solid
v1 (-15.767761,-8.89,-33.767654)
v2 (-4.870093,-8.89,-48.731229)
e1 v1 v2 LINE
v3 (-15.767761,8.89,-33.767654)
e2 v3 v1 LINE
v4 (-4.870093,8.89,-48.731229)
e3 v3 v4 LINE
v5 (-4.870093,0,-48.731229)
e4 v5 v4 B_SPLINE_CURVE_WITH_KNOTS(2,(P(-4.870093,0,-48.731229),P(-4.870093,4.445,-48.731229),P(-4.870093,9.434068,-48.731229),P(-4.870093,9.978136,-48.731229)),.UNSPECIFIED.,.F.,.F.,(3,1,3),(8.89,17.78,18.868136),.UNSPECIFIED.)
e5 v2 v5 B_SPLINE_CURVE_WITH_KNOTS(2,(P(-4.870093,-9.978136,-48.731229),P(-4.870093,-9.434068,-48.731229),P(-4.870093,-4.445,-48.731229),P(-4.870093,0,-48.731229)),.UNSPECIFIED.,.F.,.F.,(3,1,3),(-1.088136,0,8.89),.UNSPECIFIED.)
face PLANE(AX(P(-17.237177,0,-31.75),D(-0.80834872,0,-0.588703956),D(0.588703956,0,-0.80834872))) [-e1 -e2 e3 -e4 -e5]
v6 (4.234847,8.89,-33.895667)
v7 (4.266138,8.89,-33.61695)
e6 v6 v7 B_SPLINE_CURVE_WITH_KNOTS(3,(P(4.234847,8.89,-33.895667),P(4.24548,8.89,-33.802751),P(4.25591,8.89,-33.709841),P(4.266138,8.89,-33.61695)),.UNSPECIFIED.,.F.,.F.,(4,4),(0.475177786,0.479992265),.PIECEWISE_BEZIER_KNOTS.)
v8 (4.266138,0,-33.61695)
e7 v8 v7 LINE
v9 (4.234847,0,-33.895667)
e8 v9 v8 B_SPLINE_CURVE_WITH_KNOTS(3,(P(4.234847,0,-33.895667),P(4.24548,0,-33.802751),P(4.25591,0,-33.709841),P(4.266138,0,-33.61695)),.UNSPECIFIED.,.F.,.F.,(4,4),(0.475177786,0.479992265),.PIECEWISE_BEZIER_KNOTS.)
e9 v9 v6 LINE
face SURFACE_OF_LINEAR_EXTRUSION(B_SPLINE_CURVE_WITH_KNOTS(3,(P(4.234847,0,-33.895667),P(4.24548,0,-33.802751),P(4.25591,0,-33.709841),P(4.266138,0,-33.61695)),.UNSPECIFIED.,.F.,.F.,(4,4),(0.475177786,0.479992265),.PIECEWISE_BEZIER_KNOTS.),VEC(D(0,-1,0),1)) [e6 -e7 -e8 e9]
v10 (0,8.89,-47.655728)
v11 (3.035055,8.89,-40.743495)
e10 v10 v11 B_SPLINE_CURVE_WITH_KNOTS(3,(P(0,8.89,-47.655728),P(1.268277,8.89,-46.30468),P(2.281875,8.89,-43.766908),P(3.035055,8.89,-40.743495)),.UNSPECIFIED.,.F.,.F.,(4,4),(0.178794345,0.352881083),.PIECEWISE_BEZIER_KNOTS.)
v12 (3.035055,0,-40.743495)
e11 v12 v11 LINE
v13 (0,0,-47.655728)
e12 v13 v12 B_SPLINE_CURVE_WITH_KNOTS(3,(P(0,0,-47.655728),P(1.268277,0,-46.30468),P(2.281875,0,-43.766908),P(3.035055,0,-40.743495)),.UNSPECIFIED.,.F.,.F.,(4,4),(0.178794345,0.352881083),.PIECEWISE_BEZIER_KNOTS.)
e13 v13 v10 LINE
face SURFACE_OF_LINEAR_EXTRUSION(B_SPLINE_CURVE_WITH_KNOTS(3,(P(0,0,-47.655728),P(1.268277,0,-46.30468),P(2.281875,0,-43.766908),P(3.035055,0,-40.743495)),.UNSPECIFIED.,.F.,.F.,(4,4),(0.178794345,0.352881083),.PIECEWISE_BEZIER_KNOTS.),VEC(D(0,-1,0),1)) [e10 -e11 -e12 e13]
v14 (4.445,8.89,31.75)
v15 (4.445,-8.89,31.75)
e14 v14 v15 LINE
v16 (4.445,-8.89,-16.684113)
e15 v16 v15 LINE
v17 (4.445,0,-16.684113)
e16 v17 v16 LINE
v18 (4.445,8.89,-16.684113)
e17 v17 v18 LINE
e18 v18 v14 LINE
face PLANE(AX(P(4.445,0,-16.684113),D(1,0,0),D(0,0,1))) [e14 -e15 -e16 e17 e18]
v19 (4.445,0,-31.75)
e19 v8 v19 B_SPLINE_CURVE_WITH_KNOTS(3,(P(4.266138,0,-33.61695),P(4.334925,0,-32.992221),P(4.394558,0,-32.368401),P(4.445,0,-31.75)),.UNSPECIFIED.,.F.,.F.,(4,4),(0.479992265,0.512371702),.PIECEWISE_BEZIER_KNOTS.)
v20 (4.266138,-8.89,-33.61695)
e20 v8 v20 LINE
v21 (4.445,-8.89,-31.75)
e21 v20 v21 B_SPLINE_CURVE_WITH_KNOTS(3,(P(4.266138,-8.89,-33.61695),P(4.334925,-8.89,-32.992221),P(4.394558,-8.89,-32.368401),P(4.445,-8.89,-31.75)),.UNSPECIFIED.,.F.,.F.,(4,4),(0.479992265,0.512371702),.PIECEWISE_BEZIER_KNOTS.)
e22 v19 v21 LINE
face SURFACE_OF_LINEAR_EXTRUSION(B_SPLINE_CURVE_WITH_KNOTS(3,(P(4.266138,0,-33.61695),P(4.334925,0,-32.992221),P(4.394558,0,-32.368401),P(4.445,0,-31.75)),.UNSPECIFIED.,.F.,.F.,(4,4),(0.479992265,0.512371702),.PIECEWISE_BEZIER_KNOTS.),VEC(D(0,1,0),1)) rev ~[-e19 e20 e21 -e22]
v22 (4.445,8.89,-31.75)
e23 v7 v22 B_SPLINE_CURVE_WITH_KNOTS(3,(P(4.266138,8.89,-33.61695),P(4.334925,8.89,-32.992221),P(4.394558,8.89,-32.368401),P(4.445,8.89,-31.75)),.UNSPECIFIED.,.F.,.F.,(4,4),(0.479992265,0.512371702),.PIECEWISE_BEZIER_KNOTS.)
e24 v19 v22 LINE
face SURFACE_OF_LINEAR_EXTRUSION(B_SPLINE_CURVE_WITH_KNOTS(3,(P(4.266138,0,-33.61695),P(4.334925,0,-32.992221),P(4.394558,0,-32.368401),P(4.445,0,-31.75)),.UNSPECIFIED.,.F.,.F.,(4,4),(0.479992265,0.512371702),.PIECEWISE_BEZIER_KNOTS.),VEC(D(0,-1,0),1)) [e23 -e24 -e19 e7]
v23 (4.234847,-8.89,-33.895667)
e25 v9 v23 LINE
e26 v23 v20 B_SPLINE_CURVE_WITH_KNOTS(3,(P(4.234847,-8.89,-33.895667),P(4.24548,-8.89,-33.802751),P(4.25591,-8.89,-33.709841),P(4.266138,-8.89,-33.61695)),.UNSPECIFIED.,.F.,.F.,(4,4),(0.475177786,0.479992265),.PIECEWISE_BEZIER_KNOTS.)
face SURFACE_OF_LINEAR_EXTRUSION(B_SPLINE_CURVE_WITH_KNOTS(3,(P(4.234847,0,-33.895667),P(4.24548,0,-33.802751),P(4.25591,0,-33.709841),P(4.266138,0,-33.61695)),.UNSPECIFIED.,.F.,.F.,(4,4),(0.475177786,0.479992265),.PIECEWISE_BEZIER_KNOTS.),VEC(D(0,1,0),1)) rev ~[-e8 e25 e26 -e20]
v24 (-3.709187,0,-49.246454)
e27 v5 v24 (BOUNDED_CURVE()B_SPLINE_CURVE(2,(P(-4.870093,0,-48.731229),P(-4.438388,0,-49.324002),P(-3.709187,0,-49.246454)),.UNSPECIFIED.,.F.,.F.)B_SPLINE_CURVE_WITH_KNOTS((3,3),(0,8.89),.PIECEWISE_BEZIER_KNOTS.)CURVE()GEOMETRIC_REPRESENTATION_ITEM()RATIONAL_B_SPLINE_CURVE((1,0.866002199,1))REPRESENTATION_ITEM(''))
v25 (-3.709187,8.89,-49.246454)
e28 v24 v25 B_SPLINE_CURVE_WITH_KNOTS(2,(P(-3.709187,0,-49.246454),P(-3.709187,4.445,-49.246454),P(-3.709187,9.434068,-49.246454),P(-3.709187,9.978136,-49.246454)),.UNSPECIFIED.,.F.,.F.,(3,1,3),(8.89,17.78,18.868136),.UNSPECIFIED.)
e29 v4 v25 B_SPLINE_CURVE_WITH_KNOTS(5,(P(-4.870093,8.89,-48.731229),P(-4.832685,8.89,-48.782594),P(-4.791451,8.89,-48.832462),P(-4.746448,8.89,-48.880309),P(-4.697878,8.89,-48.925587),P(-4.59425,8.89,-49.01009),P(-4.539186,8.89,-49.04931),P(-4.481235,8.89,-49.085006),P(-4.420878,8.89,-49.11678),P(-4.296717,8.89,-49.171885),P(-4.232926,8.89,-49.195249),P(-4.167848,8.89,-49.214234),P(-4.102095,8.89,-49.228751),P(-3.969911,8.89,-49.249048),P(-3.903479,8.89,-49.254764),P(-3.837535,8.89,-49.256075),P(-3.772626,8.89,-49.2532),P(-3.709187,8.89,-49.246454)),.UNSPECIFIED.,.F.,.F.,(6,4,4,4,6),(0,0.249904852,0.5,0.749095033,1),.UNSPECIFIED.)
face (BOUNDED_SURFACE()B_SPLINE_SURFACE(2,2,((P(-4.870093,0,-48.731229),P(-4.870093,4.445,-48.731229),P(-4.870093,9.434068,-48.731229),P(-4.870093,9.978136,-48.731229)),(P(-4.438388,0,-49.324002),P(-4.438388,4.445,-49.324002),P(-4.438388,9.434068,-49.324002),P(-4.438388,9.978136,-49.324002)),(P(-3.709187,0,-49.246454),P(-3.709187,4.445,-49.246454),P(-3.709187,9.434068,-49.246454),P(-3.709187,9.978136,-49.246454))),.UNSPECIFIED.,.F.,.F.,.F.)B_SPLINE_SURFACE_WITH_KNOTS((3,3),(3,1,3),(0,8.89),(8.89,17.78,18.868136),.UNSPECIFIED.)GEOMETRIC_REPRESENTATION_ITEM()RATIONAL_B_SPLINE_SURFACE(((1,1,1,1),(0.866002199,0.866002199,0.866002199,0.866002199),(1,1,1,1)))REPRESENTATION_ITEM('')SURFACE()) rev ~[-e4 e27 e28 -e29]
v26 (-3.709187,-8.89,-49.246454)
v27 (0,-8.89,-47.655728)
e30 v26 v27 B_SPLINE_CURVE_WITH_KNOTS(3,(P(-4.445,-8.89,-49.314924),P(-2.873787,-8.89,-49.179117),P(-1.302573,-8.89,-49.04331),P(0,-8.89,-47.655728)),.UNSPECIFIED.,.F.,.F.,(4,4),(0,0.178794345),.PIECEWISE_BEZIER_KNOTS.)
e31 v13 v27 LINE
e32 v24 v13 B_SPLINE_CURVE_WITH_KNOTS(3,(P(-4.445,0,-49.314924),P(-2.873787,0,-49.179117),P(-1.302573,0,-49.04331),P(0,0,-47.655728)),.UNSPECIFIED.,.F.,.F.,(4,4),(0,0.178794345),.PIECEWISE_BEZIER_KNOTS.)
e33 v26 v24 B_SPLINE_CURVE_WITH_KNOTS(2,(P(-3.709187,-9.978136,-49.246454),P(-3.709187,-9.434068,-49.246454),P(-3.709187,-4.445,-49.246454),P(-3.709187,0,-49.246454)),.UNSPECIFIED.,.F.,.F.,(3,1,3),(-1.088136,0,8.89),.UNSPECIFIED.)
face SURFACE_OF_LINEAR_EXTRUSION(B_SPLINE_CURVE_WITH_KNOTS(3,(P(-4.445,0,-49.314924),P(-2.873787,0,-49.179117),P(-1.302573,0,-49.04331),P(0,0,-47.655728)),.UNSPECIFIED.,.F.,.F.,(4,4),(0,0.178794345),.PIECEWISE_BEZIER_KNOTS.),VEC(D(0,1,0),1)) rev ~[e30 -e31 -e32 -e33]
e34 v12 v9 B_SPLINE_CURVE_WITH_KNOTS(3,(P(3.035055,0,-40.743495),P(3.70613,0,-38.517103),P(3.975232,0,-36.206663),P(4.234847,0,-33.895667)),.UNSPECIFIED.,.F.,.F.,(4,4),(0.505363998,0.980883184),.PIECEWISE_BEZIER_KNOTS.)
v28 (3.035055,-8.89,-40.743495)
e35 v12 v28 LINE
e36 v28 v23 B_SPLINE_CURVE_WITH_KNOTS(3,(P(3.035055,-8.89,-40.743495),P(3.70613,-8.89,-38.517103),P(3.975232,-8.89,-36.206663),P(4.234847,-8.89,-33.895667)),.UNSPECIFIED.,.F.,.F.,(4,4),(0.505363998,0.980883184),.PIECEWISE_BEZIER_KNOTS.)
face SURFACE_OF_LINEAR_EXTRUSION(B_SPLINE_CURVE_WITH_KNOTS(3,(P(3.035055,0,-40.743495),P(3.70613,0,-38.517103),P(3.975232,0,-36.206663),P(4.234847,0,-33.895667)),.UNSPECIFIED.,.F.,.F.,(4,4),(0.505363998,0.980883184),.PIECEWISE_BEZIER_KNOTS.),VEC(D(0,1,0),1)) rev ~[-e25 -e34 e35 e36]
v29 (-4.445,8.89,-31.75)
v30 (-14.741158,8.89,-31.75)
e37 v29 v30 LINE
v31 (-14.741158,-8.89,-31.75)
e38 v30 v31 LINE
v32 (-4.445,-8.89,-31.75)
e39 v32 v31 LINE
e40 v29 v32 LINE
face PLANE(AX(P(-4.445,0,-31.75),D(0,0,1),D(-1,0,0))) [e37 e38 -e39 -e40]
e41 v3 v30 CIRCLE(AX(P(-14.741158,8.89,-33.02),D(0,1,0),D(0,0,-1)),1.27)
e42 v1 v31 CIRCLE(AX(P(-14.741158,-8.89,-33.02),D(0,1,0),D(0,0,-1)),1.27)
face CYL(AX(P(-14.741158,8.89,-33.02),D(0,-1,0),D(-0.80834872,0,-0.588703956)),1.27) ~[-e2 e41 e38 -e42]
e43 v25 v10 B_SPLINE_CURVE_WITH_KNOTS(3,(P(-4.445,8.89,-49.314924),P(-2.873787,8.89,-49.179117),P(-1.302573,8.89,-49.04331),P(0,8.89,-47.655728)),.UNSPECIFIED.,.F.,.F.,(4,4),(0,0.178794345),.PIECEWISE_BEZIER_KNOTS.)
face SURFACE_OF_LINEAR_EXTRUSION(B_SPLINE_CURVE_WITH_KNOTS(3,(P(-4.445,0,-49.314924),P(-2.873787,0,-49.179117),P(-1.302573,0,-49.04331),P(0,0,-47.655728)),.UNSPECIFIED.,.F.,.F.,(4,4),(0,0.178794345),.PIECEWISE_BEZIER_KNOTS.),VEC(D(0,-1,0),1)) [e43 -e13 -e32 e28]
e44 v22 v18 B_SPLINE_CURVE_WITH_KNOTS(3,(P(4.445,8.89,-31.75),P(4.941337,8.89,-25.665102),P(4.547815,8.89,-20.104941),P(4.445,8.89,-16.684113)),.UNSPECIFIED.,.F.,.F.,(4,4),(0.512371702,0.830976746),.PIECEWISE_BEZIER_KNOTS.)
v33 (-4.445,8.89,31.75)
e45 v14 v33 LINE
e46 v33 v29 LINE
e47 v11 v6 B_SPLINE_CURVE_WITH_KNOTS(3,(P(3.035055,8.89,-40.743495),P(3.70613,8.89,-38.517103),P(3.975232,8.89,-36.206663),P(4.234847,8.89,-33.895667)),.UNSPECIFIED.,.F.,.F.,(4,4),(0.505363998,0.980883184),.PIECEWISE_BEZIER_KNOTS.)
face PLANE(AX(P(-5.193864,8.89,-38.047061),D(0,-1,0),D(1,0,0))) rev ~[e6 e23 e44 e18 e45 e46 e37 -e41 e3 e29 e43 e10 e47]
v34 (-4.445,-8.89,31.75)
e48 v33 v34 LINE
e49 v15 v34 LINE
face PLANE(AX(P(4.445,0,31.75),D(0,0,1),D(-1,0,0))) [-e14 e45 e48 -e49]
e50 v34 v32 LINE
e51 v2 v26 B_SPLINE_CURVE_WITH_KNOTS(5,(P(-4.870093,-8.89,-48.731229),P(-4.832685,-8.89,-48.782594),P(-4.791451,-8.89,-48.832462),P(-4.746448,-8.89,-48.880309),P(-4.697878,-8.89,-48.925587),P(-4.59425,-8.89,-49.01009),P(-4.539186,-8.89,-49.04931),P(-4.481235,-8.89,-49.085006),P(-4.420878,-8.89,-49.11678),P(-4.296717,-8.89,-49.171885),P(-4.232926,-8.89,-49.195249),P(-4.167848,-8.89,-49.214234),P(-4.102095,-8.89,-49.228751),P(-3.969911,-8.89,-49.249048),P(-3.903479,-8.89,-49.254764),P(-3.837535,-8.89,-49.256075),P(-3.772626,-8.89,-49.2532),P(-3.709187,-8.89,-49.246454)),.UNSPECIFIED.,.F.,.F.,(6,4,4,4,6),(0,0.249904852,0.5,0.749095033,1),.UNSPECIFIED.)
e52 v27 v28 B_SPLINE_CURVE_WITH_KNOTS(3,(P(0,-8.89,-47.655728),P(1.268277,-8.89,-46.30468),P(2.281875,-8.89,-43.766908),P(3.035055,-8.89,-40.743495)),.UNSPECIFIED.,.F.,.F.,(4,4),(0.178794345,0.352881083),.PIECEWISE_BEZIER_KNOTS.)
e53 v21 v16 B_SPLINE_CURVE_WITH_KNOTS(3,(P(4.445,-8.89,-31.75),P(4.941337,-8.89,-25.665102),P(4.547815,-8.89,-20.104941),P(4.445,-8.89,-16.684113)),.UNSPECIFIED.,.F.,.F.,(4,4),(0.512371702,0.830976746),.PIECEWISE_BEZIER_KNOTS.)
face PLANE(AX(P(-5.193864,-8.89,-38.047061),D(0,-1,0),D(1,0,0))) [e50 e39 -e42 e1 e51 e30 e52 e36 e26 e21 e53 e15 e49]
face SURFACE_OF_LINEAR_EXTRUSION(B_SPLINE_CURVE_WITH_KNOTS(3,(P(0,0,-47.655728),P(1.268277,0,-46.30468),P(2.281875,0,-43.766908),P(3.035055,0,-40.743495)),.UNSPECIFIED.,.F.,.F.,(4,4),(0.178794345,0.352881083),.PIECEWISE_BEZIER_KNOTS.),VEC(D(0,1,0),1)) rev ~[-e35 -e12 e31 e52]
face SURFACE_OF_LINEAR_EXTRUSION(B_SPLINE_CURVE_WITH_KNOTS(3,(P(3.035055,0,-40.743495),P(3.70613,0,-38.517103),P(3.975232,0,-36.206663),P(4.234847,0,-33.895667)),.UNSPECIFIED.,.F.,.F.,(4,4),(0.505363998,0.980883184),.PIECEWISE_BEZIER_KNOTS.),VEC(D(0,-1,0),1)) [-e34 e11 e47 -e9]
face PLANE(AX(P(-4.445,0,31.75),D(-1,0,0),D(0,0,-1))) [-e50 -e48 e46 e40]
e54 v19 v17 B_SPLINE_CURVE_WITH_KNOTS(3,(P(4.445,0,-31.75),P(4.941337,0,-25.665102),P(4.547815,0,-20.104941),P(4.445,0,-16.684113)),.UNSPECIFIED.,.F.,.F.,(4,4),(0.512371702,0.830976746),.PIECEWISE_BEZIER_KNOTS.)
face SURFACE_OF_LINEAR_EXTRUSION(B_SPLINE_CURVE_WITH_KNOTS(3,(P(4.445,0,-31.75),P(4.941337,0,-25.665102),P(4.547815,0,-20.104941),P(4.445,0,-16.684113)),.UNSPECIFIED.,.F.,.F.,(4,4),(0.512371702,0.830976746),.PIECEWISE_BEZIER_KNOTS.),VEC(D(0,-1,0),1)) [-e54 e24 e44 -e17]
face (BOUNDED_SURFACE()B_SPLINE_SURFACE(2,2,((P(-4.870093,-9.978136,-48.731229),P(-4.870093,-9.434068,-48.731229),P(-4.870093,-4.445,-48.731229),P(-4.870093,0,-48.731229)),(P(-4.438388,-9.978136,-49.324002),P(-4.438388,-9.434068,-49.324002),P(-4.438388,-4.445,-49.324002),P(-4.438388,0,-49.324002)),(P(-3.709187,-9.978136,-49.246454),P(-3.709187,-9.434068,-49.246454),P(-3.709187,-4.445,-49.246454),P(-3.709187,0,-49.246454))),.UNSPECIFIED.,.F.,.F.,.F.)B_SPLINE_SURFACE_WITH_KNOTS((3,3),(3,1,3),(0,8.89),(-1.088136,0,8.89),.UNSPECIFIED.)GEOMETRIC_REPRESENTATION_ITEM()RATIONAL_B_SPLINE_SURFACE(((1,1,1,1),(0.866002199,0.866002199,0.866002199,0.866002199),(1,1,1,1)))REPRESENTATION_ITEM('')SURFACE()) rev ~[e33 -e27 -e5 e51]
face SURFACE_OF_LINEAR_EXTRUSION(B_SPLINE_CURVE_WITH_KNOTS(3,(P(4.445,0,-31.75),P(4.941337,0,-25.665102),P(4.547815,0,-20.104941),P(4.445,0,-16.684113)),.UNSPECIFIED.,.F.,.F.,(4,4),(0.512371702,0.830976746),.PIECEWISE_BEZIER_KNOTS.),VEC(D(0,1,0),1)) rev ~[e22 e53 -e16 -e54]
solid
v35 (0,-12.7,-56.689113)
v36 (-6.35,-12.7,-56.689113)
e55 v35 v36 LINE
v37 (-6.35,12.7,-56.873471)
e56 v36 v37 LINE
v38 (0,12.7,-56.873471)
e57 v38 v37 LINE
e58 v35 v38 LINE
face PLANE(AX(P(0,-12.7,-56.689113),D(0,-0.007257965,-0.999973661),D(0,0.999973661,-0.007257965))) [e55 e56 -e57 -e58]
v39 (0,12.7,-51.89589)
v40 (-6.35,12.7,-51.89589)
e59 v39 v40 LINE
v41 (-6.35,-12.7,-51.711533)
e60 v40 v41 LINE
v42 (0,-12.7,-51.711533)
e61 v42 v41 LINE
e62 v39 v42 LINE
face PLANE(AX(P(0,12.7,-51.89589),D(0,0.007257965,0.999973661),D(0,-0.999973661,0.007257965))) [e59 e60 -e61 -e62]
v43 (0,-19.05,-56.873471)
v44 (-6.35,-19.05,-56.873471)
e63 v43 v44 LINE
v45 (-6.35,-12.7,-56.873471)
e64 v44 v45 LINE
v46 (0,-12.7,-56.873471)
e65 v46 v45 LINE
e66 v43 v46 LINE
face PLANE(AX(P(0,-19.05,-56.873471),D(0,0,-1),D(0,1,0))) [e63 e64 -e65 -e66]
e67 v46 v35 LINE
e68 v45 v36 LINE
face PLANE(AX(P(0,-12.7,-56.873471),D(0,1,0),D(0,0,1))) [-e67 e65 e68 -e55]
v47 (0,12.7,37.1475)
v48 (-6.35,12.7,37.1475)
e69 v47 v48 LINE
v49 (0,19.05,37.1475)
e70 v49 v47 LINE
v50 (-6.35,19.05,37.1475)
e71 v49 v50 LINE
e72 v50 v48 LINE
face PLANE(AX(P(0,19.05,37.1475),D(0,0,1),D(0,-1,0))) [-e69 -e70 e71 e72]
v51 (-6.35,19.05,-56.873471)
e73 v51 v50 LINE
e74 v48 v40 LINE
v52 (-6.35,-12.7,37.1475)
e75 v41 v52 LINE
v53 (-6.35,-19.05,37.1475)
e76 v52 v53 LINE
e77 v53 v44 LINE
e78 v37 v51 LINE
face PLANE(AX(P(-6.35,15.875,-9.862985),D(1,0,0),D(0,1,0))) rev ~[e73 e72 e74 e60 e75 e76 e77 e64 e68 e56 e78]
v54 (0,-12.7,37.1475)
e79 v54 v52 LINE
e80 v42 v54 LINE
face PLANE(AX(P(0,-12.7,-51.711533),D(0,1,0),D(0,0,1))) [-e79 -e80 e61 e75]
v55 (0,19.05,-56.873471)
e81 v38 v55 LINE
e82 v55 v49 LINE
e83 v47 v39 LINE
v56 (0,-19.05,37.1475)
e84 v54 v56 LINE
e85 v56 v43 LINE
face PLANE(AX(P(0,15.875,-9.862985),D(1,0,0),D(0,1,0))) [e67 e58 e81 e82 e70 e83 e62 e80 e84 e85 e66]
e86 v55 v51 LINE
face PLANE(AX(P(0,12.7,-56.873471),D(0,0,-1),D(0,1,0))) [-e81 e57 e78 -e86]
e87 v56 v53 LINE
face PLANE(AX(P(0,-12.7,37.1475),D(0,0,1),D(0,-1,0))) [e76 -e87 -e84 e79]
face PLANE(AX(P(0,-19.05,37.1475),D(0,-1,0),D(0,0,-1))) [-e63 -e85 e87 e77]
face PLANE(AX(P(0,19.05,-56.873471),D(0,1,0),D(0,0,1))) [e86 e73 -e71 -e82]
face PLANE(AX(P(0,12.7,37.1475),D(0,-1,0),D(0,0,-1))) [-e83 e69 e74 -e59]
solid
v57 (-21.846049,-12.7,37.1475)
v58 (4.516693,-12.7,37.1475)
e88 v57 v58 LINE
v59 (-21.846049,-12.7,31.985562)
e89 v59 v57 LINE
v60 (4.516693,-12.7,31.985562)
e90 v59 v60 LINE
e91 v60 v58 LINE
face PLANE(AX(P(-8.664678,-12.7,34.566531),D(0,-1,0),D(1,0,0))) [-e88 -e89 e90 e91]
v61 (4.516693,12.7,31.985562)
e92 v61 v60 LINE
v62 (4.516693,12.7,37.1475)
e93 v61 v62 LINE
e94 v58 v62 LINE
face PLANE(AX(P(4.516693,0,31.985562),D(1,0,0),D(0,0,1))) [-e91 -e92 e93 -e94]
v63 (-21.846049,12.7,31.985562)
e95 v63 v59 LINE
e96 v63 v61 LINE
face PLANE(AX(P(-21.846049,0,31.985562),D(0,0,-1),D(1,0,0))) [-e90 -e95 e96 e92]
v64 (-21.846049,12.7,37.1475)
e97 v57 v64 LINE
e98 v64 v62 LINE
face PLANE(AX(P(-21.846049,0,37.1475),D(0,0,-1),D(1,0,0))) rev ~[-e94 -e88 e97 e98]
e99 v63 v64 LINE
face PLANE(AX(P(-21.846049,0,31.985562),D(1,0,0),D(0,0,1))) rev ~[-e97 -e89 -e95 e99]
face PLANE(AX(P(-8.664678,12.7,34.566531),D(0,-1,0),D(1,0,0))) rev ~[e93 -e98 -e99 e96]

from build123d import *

# Parameters (mm, degrees)
F1_DEPTH = 8.89
F2_R     = 1.27
F3_R     = 1.27
F4_W     = 26.3627418317
F4_H     = 5.1619373262
F5_DEPTH = 12.7
F7_DEPTH = 6.35


with BuildPart() as f1:
    # F0 (on Front) → F1 (new body, symmetric)
    with BuildSketch(Plane.XZ):
        with BuildLine():
            add(Edge.make_bspline(
                [(4.2661379753, -33.616950048), (4.3349248687, -32.99222106), (4.3945578489, -32.36840068), (4.445, -31.75)],
                knots=[0.4799922653, 0.4799922653, 0.4799922653, 0.4799922653, 0.5123717025, 0.5123717025, 0.5123717025, 0.5123717025], degree=3))
            Line((4.445, -31.75), (-4.445, -31.75))
            Line((-4.445, -31.75), (-17.2371771187, -31.75))
            Line((-17.2371771187, -31.75), (-4.445, -49.3149235845))
            add(Edge.make_bspline(
                [(-4.445, -49.3149235845), (-2.8737867331, -49.1791167069), (-1.3025734662, -49.0433098293), (0, -47.6557277143)],
                knots=[0, 0, 0, 0, 0.1787943452, 0.1787943452, 0.1787943452, 0.1787943452], degree=3))
            add(Edge.make_bspline(
                [(0, -47.6557277143), (1.1546532493, -45.3808190167), (2.3218615323, -43.1096212641), (3.0350551164, -40.743494961)],
                knots=[0, 0, 0, 0, 0.5053639981, 0.5053639981, 0.5053639981, 0.5053639981], degree=3))
            add(Edge.make_bspline(
                [(3.0350551164, -40.743494961), (3.5641678247, -38.6195342287), (3.9647615791, -36.2559041312), (4.2348473132, -33.8956672077)],
                knots=[0.3528810834, 0.3528810834, 0.3528810834, 0.3528810834, 0.4751777864, 0.4751777864, 0.4751777864, 0.4751777864], degree=3))
            add(Edge.make_bspline(
                [(4.2348473132, -33.8956672077), (4.2452843652, -33.8027605788), (4.2557060854, -33.7098530506), (4.2661379753, -33.616950048)],
                knots=[0.9808831842, 0.9808831842, 0.9808831842, 0.9808831842, 1, 1, 1, 1], degree=3))
        make_face()
        with BuildLine():
            Line((-4.445, -31.75), (4.445, -31.75))
            Line((4.445, -31.75), (4.445, -16.6841130704))
            add(Edge.make_bspline(
                [(4.445, -16.6841130704), (4.390455432, -14.8693285963), (4.417727716, -13.6566404294), (4.445, -12.4439522624)],
                knots=[0.830976746, 0.830976746, 0.830976746, 0.830976746, 1, 1, 1, 1], degree=3))
            Line((4.445, -12.4439522624), (4.445, 31.75))
            Line((4.445, 31.75), (-4.445, 31.75))
            Line((-4.445, 31.75), (-4.445, -31.75))
        make_face()
        with BuildLine():
            Line((4.445, -16.6841130704), (4.445, -31.75))
            add(Edge.make_bspline(
                [(4.445, -31.75), (4.9413373419, -25.665101898), (4.5478152875, -20.1049411089), (4.445, -16.6841130704)],
                knots=[0.5123717025, 0.5123717025, 0.5123717025, 0.5123717025, 0.830976746, 0.830976746, 0.830976746, 0.830976746], degree=3))
        make_face()
        with BuildLine():
            add(Edge.make_bspline(
                [(4.445, -16.6841130704), (4.390455432, -14.8693285963), (4.417727716, -13.6566404294), (4.445, -12.4439522624)],
                knots=[0.830976746, 0.830976746, 0.830976746, 0.830976746, 1, 1, 1, 1], degree=3))
            Line((4.445, -16.6841130704), (4.445, -12.4439522624))
        make_face()
        with BuildLine():
            add(Edge.make_bspline(
                [(4.2348473132, -33.8956672077), (4.2454798326, -33.802751286), (4.2559100938, -33.709840623), (4.2661379753, -33.616950048)],
                knots=[0.4751777864, 0.4751777864, 0.4751777864, 0.4751777864, 0.4799922653, 0.4799922653, 0.4799922653, 0.4799922653], degree=3))
            add(Edge.make_bspline(
                [(4.2348473132, -33.8956672077), (4.2452843652, -33.8027605788), (4.2557060854, -33.7098530506), (4.2661379753, -33.616950048)],
                knots=[0.9808831842, 0.9808831842, 0.9808831842, 0.9808831842, 1, 1, 1, 1], degree=3))
        make_face()
        with BuildLine():
            add(Edge.make_bspline(
                [(3.0350551164, -40.743494961), (3.7061302896, -38.5171027806), (3.9752319818, -36.2066631893), (4.2348473132, -33.8956672077)],
                knots=[0.5053639981, 0.5053639981, 0.5053639981, 0.5053639981, 0.9808831842, 0.9808831842, 0.9808831842, 0.9808831842], degree=3))
            add(Edge.make_bspline(
                [(3.0350551164, -40.743494961), (3.5641678247, -38.6195342287), (3.9647615791, -36.2559041312), (4.2348473132, -33.8956672077)],
                knots=[0.3528810834, 0.3528810834, 0.3528810834, 0.3528810834, 0.4751777864, 0.4751777864, 0.4751777864, 0.4751777864], degree=3))
        make_face()
        with BuildLine():
            add(Edge.make_bspline(
                [(0, -47.6557277143), (1.2682770572, -46.3046802631), (2.2818745053, -43.7669075859), (3.0350551164, -40.743494961)],
                knots=[0.1787943452, 0.1787943452, 0.1787943452, 0.1787943452, 0.3528810834, 0.3528810834, 0.3528810834, 0.3528810834], degree=3))
            add(Edge.make_bspline(
                [(0, -47.6557277143), (1.1546532493, -45.3808190167), (2.3218615323, -43.1096212641), (3.0350551164, -40.743494961)],
                knots=[0, 0, 0, 0, 0.5053639981, 0.5053639981, 0.5053639981, 0.5053639981], degree=3))
        make_face()
    extrude(amount=F1_DEPTH, both=True)

    # F2
    f2_edges = [f1.edges().sort_by_distance(p)[0] for p in [
        (-17.237177, 0, -31.75),
    ]]
    fillet(f2_edges, radius=F2_R)

    # F3
    f3_edges = [f1.edges().sort_by_distance(p)[0] for p in [
        (-4.445, 4.445, -49.314924),
        (-4.445, -4.445, -49.314924),
    ]]
    fillet(f3_edges, radius=F3_R)


with BuildPart() as f5:
    # F4 (on Front) → F5 (new body, symmetric)
    with BuildSketch(Plane.XZ):
        with Locations((-8.6646776181, 34.5665309578)):
            Rectangle(F4_W, F4_H)
    extrude(amount=F5_DEPTH, both=True)


with BuildPart() as f7:
    # F6 (on Right) → F7 (new body)
    with BuildSketch(Plane.YZ):
        Polygon((19.05, 37.1474996209), (12.7, 37.1474996209), (12.7, -51.8958903849), (12.7, -56.8734705448), (19.05, -56.8734705448), align=None)
        Polygon((12.7, -56.8734705448), (12.7, -51.8958903849), (-12.7, -51.7115332186), (-12.7, -56.6891133785), align=None)
        Polygon((-12.7, -56.6891133785), (-12.7, -51.7115332186), (-12.7, 37.1474996209), (-19.05, 37.1474996209), (-19.05, -56.8734705448), (-12.7, -56.8734705448), align=None)
    extrude(amount=-F7_DEPTH)


solid = Compound([f1.part, f5.part, f7.part])
